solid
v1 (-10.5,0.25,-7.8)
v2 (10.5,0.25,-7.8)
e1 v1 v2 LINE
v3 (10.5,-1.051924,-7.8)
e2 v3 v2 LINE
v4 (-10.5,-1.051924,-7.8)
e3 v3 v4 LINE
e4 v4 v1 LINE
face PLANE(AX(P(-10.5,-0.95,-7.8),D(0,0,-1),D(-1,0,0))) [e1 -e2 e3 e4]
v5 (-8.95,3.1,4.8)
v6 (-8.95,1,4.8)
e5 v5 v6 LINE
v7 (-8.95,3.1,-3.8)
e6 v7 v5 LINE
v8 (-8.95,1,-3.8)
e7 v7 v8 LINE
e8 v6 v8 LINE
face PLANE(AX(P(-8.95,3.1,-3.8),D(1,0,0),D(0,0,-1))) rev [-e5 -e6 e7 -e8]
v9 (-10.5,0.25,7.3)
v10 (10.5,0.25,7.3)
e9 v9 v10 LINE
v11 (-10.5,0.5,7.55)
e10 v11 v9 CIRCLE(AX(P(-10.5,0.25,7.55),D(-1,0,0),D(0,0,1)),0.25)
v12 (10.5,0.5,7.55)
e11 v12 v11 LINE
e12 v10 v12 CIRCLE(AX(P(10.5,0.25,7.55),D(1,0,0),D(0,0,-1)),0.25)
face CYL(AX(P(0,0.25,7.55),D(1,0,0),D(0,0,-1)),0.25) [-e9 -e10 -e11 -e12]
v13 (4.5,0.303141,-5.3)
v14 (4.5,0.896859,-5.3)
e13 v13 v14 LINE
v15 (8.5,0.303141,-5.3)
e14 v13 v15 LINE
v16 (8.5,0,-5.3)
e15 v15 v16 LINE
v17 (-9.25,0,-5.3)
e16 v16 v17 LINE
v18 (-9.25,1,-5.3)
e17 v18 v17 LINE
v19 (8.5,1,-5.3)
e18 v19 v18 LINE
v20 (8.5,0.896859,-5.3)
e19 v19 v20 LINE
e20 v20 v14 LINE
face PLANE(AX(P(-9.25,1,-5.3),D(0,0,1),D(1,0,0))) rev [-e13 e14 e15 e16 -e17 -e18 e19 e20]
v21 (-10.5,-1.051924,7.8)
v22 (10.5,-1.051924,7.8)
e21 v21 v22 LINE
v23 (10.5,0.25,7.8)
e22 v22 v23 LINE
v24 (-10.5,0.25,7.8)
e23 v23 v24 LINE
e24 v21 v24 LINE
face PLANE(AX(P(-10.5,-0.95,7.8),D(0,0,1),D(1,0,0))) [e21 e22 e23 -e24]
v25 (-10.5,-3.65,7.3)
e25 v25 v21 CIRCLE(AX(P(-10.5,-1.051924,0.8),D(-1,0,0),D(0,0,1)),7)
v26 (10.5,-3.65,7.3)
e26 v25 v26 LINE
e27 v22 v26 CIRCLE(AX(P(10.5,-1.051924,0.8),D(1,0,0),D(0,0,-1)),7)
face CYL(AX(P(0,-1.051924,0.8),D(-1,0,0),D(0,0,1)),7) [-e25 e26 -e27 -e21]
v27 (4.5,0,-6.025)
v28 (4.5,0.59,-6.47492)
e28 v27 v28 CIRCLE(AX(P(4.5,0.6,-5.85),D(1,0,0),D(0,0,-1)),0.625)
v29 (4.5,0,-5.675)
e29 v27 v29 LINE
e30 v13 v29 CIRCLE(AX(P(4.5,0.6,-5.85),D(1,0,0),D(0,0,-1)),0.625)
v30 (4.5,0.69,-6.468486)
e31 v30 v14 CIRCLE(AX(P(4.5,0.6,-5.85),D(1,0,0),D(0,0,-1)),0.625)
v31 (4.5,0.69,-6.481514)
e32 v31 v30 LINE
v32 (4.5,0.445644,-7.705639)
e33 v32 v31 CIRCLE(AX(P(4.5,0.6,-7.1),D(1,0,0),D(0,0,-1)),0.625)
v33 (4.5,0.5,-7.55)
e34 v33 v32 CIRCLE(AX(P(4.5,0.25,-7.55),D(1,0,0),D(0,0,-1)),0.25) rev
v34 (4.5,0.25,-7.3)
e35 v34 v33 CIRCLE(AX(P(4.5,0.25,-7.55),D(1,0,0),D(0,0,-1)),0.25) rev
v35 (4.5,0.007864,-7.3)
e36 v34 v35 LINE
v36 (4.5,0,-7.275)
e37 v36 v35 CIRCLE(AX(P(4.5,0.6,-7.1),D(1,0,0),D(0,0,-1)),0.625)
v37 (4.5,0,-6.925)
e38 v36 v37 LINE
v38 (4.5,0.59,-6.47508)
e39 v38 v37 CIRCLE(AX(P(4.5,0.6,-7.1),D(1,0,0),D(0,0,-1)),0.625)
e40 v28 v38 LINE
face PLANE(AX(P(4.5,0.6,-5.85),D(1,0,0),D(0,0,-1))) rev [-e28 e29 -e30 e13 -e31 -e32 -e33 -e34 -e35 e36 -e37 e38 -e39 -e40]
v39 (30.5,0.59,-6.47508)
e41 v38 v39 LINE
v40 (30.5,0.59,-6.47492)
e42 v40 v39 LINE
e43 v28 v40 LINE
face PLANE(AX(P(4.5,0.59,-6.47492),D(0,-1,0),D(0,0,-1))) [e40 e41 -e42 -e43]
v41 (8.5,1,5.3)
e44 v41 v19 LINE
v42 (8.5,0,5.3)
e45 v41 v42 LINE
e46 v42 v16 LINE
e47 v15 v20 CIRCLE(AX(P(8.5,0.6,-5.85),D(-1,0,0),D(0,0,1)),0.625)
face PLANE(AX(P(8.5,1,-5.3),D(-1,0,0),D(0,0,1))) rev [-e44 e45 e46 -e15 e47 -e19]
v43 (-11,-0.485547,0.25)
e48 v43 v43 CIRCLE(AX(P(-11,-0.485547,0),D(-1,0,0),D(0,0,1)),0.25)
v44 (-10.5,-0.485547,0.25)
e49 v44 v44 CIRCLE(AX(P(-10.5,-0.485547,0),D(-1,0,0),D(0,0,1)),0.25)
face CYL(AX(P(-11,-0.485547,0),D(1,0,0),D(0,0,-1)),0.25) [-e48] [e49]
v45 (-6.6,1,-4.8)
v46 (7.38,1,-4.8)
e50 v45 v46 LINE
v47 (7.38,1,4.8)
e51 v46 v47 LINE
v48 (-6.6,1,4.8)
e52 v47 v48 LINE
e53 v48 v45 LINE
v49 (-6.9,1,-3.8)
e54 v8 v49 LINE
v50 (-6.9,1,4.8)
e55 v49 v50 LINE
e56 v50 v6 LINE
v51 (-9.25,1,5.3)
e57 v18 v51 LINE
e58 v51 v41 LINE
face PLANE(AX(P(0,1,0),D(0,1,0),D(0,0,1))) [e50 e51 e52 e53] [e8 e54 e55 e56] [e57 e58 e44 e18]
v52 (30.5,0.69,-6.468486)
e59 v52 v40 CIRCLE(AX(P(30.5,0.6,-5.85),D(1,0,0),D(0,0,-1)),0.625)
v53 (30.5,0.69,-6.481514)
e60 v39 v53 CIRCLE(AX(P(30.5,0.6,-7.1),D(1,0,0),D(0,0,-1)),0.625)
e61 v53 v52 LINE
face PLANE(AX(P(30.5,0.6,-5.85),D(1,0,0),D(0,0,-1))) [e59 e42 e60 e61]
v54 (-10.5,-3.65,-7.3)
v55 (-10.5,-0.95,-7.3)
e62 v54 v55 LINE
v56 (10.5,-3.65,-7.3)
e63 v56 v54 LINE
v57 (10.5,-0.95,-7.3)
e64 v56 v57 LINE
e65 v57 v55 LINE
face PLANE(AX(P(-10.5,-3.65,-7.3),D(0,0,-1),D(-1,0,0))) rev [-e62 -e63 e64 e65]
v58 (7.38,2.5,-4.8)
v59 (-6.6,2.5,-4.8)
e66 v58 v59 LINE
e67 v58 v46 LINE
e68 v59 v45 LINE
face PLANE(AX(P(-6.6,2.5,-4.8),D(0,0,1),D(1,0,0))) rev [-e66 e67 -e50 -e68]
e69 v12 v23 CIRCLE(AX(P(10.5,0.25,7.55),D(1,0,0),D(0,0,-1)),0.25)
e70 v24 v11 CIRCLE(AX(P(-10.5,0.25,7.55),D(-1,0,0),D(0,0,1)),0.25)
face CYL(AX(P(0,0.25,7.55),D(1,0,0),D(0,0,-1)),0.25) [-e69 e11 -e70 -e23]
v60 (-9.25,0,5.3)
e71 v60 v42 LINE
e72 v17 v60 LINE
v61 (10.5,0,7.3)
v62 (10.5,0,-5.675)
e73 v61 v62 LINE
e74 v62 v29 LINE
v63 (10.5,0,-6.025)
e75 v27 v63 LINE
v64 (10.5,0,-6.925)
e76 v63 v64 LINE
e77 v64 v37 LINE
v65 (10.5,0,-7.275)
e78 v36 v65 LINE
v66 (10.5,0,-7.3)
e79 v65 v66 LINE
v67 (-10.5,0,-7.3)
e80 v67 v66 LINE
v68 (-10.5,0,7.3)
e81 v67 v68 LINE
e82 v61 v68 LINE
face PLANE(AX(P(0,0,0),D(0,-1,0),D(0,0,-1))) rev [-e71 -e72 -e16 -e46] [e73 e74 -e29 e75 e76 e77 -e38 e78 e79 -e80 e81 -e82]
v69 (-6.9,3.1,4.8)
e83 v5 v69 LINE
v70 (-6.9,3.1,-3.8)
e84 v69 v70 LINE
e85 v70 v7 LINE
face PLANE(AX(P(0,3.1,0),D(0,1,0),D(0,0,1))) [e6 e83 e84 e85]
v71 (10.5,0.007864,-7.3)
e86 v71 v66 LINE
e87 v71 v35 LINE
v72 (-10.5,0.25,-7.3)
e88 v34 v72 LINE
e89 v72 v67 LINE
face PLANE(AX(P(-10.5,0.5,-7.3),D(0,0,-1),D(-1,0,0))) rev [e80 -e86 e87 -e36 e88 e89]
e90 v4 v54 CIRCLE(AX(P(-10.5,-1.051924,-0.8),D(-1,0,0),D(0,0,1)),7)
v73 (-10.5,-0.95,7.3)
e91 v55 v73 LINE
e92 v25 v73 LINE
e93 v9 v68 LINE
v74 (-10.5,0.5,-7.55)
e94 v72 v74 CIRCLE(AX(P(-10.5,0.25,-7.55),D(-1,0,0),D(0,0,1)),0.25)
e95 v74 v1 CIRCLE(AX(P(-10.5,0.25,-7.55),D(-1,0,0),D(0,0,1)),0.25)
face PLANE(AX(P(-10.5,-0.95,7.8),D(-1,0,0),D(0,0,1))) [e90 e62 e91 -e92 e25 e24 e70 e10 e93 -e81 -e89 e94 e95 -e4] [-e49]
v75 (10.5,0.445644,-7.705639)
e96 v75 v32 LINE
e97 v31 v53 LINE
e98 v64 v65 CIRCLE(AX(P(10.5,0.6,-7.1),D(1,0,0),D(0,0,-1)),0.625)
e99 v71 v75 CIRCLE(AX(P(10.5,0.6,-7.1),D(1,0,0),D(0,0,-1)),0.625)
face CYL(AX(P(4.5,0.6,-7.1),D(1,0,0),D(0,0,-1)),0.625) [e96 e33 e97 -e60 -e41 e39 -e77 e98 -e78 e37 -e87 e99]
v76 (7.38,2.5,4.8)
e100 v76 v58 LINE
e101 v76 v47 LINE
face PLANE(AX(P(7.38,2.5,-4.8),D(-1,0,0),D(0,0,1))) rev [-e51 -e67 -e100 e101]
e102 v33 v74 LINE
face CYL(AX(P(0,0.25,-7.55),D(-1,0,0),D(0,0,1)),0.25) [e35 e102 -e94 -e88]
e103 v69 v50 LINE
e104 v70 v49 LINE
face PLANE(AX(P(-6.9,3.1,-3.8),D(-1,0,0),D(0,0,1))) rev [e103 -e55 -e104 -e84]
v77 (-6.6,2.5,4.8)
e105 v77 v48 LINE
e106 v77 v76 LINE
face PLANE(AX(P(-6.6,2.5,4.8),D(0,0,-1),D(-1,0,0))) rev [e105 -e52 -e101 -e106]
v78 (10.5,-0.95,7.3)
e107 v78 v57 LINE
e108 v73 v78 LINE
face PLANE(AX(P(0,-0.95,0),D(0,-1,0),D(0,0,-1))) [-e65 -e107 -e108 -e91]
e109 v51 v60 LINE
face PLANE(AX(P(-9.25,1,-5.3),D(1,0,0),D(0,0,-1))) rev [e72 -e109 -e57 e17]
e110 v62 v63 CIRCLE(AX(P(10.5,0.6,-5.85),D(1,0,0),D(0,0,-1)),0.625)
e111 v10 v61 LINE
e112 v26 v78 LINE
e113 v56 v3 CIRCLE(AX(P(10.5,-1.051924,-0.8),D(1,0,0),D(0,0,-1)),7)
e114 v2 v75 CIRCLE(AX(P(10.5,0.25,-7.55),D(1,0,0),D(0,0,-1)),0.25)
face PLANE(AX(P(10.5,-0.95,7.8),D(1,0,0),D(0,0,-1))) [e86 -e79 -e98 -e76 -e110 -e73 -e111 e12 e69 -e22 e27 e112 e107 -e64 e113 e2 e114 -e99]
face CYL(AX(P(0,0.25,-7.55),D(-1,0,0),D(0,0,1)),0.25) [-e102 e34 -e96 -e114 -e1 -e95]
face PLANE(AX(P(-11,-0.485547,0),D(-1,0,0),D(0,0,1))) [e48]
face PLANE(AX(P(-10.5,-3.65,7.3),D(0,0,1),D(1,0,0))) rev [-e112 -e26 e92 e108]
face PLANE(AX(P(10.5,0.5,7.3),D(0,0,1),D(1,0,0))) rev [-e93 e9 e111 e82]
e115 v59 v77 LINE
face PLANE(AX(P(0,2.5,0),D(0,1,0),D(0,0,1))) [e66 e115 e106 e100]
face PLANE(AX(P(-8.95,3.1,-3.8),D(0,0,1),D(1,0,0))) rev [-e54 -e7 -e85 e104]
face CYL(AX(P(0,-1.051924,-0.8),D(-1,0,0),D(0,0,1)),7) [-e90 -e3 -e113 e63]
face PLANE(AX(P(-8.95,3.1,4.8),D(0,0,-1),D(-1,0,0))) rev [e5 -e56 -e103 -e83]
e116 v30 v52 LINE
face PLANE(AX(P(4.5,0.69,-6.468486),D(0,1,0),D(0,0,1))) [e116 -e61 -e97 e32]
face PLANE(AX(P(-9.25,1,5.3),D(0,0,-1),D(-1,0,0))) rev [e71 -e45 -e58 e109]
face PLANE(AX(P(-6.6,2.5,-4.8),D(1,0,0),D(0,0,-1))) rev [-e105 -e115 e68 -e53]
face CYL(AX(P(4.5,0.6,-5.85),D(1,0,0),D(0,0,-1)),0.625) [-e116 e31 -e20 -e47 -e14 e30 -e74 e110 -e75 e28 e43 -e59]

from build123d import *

# Parameters (mm, degrees)
SKETCH1_W               = 21
SKETCH1_H               = 15.6
BOSS_EXTRUDE1_DEPTH     = 0.95
SKETCH2_W               = 21
SKETCH2_H               = 0.5
BOSS_EXTRUDE2_DEPTH     = 2.7
FILLET1_R               = 7
SKETCH3_W               = 17.75
SKETCH3_H               = 10.6
BOSS_EXTRUDE3_DEPTH     = 1
SKETCH4_W               = 13.98
SKETCH4_H               = 9.6
BOSS_EXTRUDE4_DEPTH     = 2.5
SKETCH5_W               = 2.05
SKETCH5_H               = 8.6
BOSS_EXTRUDE5_DEPTH     = 3.1
SKETCH6_W               = 21
SKETCH6_H               = 0.5
BOSS_EXTRUDE6_DEPTH     = 0.5
FILLET2_R               = 0.25
BOSS_EXTRUDE9_START     = -7.66445529
BOSS_EXTRUDE9_OUTLINE_W = 26
BOSS_EXTRUDE9_OUTLINE_H = 0.1
BOSS_EXTRUDE9_DEPTH     = 2.36445529
BOSS_EXTRUDE9_START_2   = 4.5
BOSS_EXTRUDE9_2_DEPTH   = 26
SKETCH8_R               = 0.25
BOSS_EXTRUDE10_DEPTH    = 0.5


with BuildPart() as part:
    # Sketch1 → Boss-Extrude1 (new body)
    with BuildSketch(Plane(origin=(0, 0, 0), x_dir=(1, 0, 0), z_dir=(0, 1, 0))):
        Rectangle(SKETCH1_W, SKETCH1_H)
    extrude(amount=-BOSS_EXTRUDE1_DEPTH)

    # Sketch2 → Boss-Extrude2 (add)
    with BuildSketch(Plane.XZ.offset(0.95)):
        with Locations((0, 7.55)):
            Rectangle(SKETCH2_W, SKETCH2_H)
        with Locations((0, -7.55)):
            Rectangle(SKETCH2_W, SKETCH2_H)
    extrude(amount=BOSS_EXTRUDE2_DEPTH)

    # Fillet1
    # the kernel refuses this fillet: 7 mm, written as the material it takes off along each edge
    with BuildSketch(Plane(origin=(-16.995190528, -3.65, -7.8), x_dir=(0, 1, 0), z_dir=(1, 0, 0))) as fillet1_piece_1:
        with BuildLine():
            CenterArc((2.598076211, 7), FILLET1_R, 248.213210702, 21.786789298)
            Line((0, 0.5), (0, 0))
            Line((0, 0), (2.598076211, 0))
        make_face()
    extrude(amount=33.990381057, mode=Mode.SUBTRACT)
    with BuildSketch(Plane(origin=(-16.995190528, -3.65, 7.8), x_dir=(0, 1, 0), z_dir=(1, 0, 0))) as fillet1_piece_2:
        with BuildLine():
            CenterArc((2.598076211, -7), FILLET1_R, 90, 21.786789298)
            Line((0, -0.5), (0, 0))
            Line((0, 0), (2.598076211, 0))
        make_face()
    extrude(amount=33.990381057, mode=Mode.SUBTRACT)

    # Sketch3 → Boss-Extrude3 (add)
    with BuildSketch(Plane(origin=(0, 0, 0), x_dir=(1, 0, 0), z_dir=(0, 1, 0))):
        with Locations((-0.375, 0)):
            Rectangle(SKETCH3_W, SKETCH3_H)
    extrude(amount=BOSS_EXTRUDE3_DEPTH)

    # Sketch4 → Boss-Extrude4 (add)
    with BuildSketch(Plane(origin=(0, 0, 0), x_dir=(1, 0, 0), z_dir=(0, 1, 0))):
        with Locations((0.39, 0)):
            Rectangle(SKETCH4_W, SKETCH4_H)
    extrude(amount=BOSS_EXTRUDE4_DEPTH)

    # Sketch5 → Boss-Extrude5 (add)
    with BuildSketch(Plane(origin=(0, 0, 0), x_dir=(1, 0, 0), z_dir=(0, 1, 0))):
        with Locations((-7.925, -0.5)):
            Rectangle(SKETCH5_W, SKETCH5_H)
    extrude(amount=BOSS_EXTRUDE5_DEPTH)

    # Sketch6 → Boss-Extrude6 (add)
    with BuildSketch(Plane(origin=(0, 0, 0), x_dir=(1, 0, 0), z_dir=(0, 1, 0))):
        with Locations((0, 7.55)):
            Rectangle(SKETCH6_W, SKETCH6_H)
        with Locations((0, -7.55)):
            Rectangle(SKETCH6_W, SKETCH6_H)
    extrude(amount=BOSS_EXTRUDE6_DEPTH)

    # Fillet2
    fillet2_edges = [part.edges().sort_by_distance(p)[0] for p in [
        (0, 0.5, 7.8),
        (0, 0.5, 7.3),
        (0, 0.5, -7.3),
        (0, 0.5, -7.8),
    ]]
    fillet(fillet2_edges, radius=FILLET2_R - 0.0001)  # a hair under: the kernel refuses the full size

    # Boss-Extrude9: read off the stored shape, not the designer's step
    # Boss-Extrude9 outline → Boss-Extrude9 (add)
    with BuildSketch(Plane.XY.offset(BOSS_EXTRUDE9_START)):
        with Locations((17.5, 0.64)):
            Rectangle(BOSS_EXTRUDE9_OUTLINE_W, BOSS_EXTRUDE9_OUTLINE_H)
    extrude(amount=BOSS_EXTRUDE9_DEPTH)

    # Boss-Extrude9 2 outline → Boss-Extrude9 2 (add)
    with BuildSketch(Plane.YZ.offset(BOSS_EXTRUDE9_START_2)):
        with BuildLine():
            Line((0.69, -5.3), (0.69, -6.468486055))
            ThreePointArc((0.69, -6.468486055), (0.559870848, -5.22628961), (0.59, -6.474919995))
            Line((0.59, -6.474919995), (0.59, -5.3))
            Line((0.59, -5.3), (0.69, -5.3))
        make_face()
        with BuildLine():
            Line((0.69, -6.481513945), (0.69, -7.66445529))
            Line((0.69, -7.66445529), (0.59, -7.66445529))
            Line((0.59, -7.66445529), (0.59, -6.475080005))
            ThreePointArc((0.59, -6.475080005), (0.559870848, -7.72371039), (0.69, -6.481513945))
        make_face()
    extrude(amount=BOSS_EXTRUDE9_2_DEPTH)

    # Sketch8 → Boss-Extrude10 (add)
    with BuildSketch(Plane.ZY.offset(10.5)):
        with Locations((0, -0.485546963)):
            Circle(SKETCH8_R)
    extrude(amount=BOSS_EXTRUDE10_DEPTH)


solid = part.part
